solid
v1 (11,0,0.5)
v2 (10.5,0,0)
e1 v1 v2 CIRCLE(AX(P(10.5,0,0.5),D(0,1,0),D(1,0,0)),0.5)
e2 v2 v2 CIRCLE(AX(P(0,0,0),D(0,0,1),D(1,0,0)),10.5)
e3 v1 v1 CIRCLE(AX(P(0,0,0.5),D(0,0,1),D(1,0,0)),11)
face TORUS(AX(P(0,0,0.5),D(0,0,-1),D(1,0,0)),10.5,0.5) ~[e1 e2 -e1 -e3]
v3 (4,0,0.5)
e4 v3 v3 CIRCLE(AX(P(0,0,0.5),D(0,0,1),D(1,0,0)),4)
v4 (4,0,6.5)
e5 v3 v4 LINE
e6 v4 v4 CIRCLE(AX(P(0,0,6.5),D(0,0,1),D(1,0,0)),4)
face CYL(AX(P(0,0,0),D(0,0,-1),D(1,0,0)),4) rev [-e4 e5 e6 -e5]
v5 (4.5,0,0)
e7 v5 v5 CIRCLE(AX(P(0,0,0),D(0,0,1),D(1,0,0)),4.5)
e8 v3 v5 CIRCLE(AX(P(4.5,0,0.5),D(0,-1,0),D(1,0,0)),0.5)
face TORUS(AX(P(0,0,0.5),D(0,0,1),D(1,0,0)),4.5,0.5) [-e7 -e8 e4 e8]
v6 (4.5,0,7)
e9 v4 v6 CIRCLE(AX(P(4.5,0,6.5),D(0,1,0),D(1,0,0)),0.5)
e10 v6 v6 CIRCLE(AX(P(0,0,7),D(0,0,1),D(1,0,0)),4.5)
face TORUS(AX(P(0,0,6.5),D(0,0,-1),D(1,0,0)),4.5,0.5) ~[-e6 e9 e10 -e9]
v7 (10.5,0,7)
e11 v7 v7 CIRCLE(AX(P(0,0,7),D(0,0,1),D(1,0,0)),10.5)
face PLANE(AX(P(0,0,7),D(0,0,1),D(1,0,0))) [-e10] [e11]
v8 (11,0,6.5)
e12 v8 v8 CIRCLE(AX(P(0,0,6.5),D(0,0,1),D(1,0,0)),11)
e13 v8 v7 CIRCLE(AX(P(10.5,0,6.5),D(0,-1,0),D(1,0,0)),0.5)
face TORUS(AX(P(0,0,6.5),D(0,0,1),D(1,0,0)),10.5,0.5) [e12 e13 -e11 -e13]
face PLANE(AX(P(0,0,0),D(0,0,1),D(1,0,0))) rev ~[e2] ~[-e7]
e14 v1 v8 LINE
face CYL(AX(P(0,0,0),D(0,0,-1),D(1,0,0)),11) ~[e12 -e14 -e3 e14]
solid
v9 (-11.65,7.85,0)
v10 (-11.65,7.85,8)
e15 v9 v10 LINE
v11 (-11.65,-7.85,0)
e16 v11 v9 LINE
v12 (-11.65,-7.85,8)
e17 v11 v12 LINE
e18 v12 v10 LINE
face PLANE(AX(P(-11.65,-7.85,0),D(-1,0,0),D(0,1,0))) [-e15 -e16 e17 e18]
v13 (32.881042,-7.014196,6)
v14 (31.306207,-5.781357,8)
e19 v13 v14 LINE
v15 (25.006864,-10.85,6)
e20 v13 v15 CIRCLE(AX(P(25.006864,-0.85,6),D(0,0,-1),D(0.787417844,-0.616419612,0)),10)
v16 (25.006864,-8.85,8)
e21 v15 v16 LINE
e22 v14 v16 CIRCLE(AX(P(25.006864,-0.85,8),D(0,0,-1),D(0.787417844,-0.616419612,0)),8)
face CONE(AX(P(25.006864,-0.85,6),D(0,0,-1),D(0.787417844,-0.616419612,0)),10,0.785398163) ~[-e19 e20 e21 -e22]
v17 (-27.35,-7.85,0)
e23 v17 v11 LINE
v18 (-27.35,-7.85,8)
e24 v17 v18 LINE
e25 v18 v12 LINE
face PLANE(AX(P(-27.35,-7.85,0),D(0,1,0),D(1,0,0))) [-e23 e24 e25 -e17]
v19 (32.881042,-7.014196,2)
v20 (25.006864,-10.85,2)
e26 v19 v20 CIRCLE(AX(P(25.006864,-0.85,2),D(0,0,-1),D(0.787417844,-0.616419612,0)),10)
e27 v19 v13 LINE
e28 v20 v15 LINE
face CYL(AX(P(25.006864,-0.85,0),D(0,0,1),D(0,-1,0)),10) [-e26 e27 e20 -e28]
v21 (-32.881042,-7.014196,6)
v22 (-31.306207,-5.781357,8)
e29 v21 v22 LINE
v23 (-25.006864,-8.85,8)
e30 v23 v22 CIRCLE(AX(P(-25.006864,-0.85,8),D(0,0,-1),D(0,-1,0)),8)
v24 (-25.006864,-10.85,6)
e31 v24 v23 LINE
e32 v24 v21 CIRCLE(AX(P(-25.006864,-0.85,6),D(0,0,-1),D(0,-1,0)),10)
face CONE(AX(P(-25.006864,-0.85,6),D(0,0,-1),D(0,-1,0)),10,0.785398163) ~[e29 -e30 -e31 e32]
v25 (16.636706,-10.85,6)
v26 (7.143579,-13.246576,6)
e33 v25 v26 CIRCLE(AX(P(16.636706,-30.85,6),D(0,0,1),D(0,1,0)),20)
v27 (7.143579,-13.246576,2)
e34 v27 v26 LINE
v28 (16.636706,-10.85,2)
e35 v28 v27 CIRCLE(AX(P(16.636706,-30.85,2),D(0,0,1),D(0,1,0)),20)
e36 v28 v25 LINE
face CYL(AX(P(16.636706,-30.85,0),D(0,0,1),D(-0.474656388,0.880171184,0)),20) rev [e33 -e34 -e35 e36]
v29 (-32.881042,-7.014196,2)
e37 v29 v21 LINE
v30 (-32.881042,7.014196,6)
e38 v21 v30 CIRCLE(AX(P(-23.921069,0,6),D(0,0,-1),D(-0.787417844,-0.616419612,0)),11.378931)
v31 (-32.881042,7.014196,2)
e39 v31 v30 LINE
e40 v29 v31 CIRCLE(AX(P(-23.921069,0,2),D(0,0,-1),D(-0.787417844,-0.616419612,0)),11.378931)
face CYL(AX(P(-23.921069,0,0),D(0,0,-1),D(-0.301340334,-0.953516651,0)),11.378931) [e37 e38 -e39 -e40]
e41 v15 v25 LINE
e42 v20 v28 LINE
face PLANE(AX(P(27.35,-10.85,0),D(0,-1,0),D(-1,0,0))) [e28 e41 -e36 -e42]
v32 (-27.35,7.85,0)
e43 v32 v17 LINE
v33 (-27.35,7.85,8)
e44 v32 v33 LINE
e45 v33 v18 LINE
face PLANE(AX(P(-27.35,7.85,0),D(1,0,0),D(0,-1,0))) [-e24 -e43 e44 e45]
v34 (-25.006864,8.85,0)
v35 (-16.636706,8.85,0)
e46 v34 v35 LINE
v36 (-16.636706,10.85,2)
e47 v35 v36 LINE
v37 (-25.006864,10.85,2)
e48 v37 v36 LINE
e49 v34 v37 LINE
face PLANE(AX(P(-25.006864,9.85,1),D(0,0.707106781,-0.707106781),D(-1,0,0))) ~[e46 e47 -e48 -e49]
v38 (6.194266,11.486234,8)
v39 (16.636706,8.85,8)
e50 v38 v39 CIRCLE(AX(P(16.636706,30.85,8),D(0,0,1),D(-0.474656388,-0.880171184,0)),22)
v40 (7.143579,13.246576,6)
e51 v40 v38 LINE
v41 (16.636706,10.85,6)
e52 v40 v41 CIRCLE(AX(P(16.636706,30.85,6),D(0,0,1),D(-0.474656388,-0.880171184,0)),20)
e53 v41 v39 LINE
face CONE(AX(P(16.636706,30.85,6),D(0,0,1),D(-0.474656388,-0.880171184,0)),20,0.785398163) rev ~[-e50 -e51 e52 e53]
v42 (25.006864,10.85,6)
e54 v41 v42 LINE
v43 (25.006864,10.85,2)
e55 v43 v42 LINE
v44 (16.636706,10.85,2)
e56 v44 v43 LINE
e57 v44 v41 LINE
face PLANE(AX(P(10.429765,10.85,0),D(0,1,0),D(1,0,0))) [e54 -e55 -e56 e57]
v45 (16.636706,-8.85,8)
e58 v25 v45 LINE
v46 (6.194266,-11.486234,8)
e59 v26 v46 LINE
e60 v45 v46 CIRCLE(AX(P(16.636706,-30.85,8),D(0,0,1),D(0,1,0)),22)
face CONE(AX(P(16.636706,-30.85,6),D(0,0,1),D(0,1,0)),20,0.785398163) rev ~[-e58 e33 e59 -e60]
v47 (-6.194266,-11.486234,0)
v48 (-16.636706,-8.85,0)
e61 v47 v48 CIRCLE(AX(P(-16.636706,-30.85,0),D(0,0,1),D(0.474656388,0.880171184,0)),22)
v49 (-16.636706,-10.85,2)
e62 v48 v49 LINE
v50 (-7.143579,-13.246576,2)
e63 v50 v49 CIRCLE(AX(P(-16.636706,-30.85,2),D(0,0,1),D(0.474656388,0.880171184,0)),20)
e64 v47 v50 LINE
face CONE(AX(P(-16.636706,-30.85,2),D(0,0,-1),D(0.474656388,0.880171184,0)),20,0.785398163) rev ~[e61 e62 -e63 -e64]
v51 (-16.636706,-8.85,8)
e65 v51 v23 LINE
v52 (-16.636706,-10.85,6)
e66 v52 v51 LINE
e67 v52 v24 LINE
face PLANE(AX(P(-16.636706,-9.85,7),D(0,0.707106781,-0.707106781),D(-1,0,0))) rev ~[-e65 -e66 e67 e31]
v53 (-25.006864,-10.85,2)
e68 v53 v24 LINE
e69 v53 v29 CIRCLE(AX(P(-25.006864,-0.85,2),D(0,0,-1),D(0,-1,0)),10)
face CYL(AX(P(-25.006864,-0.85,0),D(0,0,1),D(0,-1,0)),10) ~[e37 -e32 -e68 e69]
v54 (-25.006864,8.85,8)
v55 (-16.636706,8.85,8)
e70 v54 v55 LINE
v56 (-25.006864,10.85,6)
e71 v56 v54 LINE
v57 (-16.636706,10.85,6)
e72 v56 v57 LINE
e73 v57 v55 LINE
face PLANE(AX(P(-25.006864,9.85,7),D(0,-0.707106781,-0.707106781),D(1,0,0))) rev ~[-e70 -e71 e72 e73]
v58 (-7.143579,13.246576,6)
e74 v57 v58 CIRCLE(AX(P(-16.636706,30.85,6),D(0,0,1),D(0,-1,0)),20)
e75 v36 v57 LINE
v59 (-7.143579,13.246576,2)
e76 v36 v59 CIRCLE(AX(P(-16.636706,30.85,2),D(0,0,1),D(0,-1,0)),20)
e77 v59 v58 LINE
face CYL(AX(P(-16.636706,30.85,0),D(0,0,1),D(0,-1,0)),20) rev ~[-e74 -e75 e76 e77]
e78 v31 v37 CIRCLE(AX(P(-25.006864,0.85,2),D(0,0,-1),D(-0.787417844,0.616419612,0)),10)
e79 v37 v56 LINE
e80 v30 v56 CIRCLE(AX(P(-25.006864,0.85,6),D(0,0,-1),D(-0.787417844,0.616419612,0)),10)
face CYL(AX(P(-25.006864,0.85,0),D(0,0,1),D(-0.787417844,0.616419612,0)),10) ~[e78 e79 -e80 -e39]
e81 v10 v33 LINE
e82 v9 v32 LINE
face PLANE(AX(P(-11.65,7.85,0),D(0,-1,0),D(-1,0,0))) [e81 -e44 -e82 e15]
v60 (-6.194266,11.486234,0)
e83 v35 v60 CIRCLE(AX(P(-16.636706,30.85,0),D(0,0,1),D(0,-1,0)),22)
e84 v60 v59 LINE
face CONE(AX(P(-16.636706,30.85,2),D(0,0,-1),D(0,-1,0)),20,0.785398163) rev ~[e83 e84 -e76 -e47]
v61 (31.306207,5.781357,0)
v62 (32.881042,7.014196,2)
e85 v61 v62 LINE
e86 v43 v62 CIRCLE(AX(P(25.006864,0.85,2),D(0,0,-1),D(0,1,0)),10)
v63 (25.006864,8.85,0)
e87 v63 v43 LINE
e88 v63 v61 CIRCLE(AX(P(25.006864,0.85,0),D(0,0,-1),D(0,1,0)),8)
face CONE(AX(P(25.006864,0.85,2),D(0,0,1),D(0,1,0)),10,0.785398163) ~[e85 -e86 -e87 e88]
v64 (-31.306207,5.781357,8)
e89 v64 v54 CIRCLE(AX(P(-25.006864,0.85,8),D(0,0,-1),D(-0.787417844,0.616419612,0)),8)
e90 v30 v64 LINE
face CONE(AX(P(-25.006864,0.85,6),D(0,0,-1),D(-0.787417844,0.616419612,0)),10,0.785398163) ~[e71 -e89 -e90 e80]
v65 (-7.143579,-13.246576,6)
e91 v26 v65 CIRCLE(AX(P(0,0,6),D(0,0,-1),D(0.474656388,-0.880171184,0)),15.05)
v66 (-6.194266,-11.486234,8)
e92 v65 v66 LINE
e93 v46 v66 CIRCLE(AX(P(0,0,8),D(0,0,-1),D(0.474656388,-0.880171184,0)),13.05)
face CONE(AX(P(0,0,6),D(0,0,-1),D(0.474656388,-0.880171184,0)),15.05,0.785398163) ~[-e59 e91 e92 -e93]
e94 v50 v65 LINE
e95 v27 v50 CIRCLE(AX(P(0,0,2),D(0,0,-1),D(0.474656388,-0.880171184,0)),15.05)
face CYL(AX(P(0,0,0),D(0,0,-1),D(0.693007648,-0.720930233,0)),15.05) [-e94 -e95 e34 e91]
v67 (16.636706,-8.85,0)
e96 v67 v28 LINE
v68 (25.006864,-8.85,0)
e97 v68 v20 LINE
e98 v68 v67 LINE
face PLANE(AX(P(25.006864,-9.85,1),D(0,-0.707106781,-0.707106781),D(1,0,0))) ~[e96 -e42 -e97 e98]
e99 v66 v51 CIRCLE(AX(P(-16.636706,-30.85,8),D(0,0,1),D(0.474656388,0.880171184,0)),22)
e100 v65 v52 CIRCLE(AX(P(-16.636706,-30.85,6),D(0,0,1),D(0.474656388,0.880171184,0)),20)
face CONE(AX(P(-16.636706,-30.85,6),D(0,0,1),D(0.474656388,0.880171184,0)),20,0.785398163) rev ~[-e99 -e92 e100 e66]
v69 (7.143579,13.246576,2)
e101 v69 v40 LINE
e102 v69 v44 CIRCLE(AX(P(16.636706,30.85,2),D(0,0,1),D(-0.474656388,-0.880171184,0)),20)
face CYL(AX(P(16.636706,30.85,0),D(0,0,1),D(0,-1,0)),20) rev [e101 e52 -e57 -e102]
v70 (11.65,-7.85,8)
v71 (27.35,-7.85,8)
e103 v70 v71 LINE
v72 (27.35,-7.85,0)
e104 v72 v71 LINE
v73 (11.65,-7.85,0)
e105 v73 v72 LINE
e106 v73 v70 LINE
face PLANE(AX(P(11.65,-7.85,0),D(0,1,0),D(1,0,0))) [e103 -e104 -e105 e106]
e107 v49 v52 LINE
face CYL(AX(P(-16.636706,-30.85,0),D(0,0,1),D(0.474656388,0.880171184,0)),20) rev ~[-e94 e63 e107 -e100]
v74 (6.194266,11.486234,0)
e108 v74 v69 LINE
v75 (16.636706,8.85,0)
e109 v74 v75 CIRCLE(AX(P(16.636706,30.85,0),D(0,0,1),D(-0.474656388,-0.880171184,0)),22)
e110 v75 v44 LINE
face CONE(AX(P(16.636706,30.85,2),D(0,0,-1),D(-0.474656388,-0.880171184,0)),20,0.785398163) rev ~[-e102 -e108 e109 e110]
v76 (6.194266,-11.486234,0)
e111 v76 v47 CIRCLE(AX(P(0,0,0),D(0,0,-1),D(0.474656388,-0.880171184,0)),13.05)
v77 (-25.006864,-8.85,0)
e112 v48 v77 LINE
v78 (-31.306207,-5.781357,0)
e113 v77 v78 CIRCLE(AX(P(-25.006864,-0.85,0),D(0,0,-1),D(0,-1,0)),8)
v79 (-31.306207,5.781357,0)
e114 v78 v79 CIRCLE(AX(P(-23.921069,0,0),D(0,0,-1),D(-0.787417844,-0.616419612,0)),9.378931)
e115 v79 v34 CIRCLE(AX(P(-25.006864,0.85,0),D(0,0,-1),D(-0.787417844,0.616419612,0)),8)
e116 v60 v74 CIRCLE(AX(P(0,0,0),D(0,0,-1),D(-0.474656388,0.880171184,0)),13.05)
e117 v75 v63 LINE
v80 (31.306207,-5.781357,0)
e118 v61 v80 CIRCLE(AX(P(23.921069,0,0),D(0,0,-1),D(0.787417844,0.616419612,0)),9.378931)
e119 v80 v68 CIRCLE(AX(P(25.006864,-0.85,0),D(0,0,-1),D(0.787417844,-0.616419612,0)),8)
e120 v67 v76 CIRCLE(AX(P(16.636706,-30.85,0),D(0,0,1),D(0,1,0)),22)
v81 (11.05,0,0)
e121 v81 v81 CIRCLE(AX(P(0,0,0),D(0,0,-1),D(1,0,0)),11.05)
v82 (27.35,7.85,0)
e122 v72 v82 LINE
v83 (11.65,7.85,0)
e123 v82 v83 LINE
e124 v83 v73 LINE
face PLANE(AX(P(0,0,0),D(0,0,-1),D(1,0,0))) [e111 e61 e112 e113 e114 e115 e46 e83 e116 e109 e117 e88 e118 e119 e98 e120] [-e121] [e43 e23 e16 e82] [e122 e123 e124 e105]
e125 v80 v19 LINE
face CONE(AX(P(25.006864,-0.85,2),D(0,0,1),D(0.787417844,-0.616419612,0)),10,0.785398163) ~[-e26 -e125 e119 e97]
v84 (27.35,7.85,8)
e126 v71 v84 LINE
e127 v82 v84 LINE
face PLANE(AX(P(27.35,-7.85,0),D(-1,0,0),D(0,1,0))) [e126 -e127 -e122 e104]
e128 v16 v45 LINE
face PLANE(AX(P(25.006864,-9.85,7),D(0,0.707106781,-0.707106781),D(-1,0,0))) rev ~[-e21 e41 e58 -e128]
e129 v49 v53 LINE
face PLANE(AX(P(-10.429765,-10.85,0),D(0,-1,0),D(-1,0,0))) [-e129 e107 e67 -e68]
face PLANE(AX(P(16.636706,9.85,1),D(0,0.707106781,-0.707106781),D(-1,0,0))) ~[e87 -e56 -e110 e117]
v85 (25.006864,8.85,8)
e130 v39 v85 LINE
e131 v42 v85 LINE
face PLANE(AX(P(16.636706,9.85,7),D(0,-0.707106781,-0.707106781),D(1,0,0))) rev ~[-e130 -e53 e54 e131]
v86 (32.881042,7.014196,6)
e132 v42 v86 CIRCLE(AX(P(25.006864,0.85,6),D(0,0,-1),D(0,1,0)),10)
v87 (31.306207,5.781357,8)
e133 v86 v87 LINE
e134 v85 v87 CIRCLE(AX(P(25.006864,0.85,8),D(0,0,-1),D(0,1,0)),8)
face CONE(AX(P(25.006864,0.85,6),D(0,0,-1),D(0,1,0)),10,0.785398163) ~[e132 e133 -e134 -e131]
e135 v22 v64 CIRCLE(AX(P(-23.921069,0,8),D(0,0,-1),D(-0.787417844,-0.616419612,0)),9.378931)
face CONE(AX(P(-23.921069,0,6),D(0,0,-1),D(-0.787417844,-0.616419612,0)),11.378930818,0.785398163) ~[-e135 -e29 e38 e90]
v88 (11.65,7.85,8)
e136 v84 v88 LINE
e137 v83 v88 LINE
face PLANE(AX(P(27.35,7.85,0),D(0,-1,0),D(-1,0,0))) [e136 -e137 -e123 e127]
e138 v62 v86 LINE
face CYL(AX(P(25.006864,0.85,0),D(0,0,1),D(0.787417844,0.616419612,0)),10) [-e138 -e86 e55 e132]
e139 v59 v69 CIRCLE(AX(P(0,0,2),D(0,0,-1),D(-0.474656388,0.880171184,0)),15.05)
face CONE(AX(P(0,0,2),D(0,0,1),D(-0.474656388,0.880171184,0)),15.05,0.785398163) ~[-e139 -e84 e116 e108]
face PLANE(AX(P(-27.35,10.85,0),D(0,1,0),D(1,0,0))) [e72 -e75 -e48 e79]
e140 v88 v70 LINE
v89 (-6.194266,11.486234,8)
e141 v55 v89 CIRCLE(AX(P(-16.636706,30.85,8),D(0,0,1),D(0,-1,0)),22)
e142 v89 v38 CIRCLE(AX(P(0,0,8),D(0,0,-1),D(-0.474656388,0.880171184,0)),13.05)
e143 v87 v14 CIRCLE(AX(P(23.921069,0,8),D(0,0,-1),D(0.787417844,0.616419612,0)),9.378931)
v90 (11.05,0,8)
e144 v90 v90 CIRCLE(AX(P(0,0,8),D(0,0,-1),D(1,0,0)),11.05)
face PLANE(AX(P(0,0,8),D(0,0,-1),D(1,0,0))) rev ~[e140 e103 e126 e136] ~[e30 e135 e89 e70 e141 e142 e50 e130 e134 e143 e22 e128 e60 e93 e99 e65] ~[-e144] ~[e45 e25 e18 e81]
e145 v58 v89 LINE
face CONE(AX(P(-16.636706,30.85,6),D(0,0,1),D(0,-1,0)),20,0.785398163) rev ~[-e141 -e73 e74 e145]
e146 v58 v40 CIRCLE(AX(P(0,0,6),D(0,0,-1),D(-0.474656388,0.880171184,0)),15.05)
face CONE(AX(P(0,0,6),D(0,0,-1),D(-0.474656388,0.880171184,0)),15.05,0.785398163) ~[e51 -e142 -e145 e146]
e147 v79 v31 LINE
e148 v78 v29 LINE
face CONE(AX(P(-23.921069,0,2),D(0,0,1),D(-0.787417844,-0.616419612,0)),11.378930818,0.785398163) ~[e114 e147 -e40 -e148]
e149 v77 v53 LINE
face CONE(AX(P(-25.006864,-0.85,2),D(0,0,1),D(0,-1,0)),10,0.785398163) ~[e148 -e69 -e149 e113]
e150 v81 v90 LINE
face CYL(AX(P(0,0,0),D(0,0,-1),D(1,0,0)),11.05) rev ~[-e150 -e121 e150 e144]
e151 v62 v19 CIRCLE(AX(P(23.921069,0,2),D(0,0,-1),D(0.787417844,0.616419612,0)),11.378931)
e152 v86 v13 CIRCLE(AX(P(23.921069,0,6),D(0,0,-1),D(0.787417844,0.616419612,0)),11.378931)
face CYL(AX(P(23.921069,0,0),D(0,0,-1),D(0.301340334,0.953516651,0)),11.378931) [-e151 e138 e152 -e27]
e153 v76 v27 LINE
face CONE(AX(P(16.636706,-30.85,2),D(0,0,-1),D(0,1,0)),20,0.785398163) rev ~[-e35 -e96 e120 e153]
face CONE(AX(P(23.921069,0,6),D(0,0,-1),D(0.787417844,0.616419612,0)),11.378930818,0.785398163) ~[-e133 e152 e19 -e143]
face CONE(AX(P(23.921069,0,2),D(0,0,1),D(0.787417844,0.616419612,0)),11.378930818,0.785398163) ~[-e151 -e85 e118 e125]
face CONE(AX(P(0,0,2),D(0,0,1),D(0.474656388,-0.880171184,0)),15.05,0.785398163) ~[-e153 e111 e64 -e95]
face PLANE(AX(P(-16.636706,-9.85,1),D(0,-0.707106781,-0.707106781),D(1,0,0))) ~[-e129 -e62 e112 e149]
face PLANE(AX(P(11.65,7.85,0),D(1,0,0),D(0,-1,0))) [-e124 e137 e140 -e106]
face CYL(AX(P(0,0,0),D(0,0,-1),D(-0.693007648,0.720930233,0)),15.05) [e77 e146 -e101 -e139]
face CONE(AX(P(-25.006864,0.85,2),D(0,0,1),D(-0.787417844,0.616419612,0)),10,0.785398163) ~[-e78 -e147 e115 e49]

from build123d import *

# Parameters (mm, degrees)
F0_R     = 11
F0_R_2   = 4
F1_DEPTH = 7
F3_R     = 0.5
F2_R     = 11.05
F4_DEPTH = 8
F5_R     = 20
F6_R     = 10
F7_SIZE  = 2


# Not quite as in the source:
# - a feature names something its author has since deleted; it is built from what else it names


with BuildPart() as f1:
    # F0 (on Top) → F1 (new body)
    with BuildSketch(Plane.XY):
        Circle(F0_R)
        Circle(F0_R_2, mode=Mode.SUBTRACT)
    extrude(amount=F1_DEPTH)

    # F3
    f3_edges = [f1.edges().sort_by_distance(p)[0] for p in [
        (-11, 0, 0),
        (-4, 0, 0),
        (-11, 0, 7),
        (-4, 0, 7),
    ]]
    fillet(f3_edges, radius=F3_R)


with BuildPart() as f4:
    # F2 (on face) → F4 (new body)
    with BuildSketch(Plane(origin=(0, 0, 0), x_dir=(1, 0, 0), z_dir=(0, 0, -1))):
        with BuildLine():
            ThreePointArc((12.8405607354, 7.85), (11.731454134, 9.4273794822), (10.429765098, 10.85))
            ThreePointArc((10.429765098, 10.85), (0, 15.05), (-10.429765098, 10.85))
            ThreePointArc((-10.429765098, 10.85), (-11.731454134, 9.4273794822), (-12.8405607354, 7.85))
            Line((-12.8405607354, 7.85), (-11.65, 7.85))
            Line((-11.65, 7.85), (-11.65, -7.85))
            Line((-11.65, -7.85), (-12.8405607354, -7.85))
            ThreePointArc((-12.8405607354, -7.85), (-11.731454134, -9.4273794822), (-10.429765098, -10.85))
            ThreePointArc((-10.429765098, -10.85), (0, -15.05), (10.429765098, -10.85))
            ThreePointArc((10.429765098, -10.85), (11.731454134, -9.4273794822), (12.8405607354, -7.85))
            Line((12.8405607354, -7.85), (11.65, -7.85))
            Line((11.65, -7.85), (11.65, 7.85))
            Line((11.65, 7.85), (12.8405607354, 7.85))
        make_face()
        Circle(F2_R, mode=Mode.SUBTRACT)
        with BuildLine():
            Line((23, 10.85), (10.429765098, 10.85))
            ThreePointArc((10.429765098, 10.85), (11.731454134, 9.4273794822), (12.8405607354, 7.85))
            Line((12.8405607354, 7.85), (27.35, 7.85))
            Line((27.35, 7.85), (27.35, -7.85))
            Line((27.35, -7.85), (12.8405607354, -7.85))
            ThreePointArc((12.8405607354, -7.85), (11.731454134, -9.4273794822), (10.429765098, -10.85))
            Line((10.429765098, -10.85), (23, -10.85))
            Line((23, -10.85), (27.35, -10.85))
            ThreePointArc((27.35, -10.85), (35.3, 0), (27.35, 10.85))
            Line((27.35, 10.85), (23, 10.85))
        make_face()
        with BuildLine():
            ThreePointArc((-12.8405607354, 7.85), (-11.731454134, 9.4273794822), (-10.429765098, 10.85))
            Line((-10.429765098, 10.85), (-23, 10.85))
            Line((-23, 10.85), (-27.35, 10.85))
            ThreePointArc((-27.35, 10.85), (-35.3, 0), (-27.35, -10.85))
            Line((-27.35, -10.85), (-23, -10.85))
            Line((-23, -10.85), (-10.429765098, -10.85))
            ThreePointArc((-10.429765098, -10.85), (-11.731454134, -9.4273794822), (-12.8405607354, -7.85))
            Line((-12.8405607354, -7.85), (-27.35, -7.85))
            Line((-27.35, -7.85), (-27.35, 7.85))
            Line((-27.35, 7.85), (-12.8405607354, 7.85))
        make_face()
    extrude(amount=-F4_DEPTH)

    # F5
    f5_edges = [f4.edges().sort_by_distance(p)[0] for p in [
        (10.429765, -10.85, 4),
        (10.429765, 10.85, 4),
        (-10.429765, 10.85, 4),
        (-10.429765, -10.85, 4),
    ]]
    fillet(f5_edges, radius=F5_R)

    # F6
    f6_edges = [f4.edges().sort_by_distance(p)[0] for p in [
        (-27.35, -10.85, 4),
        (-27.35, 10.85, 4),
        (27.35, 10.85, 4),
        (27.35, -10.85, 4),
    ]]
    fillet(f6_edges, radius=F6_R)

    # F7
    f7_edges = [f4.edges().sort_by_distance(p)[0] for p in [
        (35.3, 0, 8),
        (-29.38625, -9.840049, 8),
        (-35.3, 0, 0),
        (35.3, 0, 0),
    ]]
    chamfer(f7_edges, length=F7_SIZE)


solid = Compound([f1.part, f4.part])
